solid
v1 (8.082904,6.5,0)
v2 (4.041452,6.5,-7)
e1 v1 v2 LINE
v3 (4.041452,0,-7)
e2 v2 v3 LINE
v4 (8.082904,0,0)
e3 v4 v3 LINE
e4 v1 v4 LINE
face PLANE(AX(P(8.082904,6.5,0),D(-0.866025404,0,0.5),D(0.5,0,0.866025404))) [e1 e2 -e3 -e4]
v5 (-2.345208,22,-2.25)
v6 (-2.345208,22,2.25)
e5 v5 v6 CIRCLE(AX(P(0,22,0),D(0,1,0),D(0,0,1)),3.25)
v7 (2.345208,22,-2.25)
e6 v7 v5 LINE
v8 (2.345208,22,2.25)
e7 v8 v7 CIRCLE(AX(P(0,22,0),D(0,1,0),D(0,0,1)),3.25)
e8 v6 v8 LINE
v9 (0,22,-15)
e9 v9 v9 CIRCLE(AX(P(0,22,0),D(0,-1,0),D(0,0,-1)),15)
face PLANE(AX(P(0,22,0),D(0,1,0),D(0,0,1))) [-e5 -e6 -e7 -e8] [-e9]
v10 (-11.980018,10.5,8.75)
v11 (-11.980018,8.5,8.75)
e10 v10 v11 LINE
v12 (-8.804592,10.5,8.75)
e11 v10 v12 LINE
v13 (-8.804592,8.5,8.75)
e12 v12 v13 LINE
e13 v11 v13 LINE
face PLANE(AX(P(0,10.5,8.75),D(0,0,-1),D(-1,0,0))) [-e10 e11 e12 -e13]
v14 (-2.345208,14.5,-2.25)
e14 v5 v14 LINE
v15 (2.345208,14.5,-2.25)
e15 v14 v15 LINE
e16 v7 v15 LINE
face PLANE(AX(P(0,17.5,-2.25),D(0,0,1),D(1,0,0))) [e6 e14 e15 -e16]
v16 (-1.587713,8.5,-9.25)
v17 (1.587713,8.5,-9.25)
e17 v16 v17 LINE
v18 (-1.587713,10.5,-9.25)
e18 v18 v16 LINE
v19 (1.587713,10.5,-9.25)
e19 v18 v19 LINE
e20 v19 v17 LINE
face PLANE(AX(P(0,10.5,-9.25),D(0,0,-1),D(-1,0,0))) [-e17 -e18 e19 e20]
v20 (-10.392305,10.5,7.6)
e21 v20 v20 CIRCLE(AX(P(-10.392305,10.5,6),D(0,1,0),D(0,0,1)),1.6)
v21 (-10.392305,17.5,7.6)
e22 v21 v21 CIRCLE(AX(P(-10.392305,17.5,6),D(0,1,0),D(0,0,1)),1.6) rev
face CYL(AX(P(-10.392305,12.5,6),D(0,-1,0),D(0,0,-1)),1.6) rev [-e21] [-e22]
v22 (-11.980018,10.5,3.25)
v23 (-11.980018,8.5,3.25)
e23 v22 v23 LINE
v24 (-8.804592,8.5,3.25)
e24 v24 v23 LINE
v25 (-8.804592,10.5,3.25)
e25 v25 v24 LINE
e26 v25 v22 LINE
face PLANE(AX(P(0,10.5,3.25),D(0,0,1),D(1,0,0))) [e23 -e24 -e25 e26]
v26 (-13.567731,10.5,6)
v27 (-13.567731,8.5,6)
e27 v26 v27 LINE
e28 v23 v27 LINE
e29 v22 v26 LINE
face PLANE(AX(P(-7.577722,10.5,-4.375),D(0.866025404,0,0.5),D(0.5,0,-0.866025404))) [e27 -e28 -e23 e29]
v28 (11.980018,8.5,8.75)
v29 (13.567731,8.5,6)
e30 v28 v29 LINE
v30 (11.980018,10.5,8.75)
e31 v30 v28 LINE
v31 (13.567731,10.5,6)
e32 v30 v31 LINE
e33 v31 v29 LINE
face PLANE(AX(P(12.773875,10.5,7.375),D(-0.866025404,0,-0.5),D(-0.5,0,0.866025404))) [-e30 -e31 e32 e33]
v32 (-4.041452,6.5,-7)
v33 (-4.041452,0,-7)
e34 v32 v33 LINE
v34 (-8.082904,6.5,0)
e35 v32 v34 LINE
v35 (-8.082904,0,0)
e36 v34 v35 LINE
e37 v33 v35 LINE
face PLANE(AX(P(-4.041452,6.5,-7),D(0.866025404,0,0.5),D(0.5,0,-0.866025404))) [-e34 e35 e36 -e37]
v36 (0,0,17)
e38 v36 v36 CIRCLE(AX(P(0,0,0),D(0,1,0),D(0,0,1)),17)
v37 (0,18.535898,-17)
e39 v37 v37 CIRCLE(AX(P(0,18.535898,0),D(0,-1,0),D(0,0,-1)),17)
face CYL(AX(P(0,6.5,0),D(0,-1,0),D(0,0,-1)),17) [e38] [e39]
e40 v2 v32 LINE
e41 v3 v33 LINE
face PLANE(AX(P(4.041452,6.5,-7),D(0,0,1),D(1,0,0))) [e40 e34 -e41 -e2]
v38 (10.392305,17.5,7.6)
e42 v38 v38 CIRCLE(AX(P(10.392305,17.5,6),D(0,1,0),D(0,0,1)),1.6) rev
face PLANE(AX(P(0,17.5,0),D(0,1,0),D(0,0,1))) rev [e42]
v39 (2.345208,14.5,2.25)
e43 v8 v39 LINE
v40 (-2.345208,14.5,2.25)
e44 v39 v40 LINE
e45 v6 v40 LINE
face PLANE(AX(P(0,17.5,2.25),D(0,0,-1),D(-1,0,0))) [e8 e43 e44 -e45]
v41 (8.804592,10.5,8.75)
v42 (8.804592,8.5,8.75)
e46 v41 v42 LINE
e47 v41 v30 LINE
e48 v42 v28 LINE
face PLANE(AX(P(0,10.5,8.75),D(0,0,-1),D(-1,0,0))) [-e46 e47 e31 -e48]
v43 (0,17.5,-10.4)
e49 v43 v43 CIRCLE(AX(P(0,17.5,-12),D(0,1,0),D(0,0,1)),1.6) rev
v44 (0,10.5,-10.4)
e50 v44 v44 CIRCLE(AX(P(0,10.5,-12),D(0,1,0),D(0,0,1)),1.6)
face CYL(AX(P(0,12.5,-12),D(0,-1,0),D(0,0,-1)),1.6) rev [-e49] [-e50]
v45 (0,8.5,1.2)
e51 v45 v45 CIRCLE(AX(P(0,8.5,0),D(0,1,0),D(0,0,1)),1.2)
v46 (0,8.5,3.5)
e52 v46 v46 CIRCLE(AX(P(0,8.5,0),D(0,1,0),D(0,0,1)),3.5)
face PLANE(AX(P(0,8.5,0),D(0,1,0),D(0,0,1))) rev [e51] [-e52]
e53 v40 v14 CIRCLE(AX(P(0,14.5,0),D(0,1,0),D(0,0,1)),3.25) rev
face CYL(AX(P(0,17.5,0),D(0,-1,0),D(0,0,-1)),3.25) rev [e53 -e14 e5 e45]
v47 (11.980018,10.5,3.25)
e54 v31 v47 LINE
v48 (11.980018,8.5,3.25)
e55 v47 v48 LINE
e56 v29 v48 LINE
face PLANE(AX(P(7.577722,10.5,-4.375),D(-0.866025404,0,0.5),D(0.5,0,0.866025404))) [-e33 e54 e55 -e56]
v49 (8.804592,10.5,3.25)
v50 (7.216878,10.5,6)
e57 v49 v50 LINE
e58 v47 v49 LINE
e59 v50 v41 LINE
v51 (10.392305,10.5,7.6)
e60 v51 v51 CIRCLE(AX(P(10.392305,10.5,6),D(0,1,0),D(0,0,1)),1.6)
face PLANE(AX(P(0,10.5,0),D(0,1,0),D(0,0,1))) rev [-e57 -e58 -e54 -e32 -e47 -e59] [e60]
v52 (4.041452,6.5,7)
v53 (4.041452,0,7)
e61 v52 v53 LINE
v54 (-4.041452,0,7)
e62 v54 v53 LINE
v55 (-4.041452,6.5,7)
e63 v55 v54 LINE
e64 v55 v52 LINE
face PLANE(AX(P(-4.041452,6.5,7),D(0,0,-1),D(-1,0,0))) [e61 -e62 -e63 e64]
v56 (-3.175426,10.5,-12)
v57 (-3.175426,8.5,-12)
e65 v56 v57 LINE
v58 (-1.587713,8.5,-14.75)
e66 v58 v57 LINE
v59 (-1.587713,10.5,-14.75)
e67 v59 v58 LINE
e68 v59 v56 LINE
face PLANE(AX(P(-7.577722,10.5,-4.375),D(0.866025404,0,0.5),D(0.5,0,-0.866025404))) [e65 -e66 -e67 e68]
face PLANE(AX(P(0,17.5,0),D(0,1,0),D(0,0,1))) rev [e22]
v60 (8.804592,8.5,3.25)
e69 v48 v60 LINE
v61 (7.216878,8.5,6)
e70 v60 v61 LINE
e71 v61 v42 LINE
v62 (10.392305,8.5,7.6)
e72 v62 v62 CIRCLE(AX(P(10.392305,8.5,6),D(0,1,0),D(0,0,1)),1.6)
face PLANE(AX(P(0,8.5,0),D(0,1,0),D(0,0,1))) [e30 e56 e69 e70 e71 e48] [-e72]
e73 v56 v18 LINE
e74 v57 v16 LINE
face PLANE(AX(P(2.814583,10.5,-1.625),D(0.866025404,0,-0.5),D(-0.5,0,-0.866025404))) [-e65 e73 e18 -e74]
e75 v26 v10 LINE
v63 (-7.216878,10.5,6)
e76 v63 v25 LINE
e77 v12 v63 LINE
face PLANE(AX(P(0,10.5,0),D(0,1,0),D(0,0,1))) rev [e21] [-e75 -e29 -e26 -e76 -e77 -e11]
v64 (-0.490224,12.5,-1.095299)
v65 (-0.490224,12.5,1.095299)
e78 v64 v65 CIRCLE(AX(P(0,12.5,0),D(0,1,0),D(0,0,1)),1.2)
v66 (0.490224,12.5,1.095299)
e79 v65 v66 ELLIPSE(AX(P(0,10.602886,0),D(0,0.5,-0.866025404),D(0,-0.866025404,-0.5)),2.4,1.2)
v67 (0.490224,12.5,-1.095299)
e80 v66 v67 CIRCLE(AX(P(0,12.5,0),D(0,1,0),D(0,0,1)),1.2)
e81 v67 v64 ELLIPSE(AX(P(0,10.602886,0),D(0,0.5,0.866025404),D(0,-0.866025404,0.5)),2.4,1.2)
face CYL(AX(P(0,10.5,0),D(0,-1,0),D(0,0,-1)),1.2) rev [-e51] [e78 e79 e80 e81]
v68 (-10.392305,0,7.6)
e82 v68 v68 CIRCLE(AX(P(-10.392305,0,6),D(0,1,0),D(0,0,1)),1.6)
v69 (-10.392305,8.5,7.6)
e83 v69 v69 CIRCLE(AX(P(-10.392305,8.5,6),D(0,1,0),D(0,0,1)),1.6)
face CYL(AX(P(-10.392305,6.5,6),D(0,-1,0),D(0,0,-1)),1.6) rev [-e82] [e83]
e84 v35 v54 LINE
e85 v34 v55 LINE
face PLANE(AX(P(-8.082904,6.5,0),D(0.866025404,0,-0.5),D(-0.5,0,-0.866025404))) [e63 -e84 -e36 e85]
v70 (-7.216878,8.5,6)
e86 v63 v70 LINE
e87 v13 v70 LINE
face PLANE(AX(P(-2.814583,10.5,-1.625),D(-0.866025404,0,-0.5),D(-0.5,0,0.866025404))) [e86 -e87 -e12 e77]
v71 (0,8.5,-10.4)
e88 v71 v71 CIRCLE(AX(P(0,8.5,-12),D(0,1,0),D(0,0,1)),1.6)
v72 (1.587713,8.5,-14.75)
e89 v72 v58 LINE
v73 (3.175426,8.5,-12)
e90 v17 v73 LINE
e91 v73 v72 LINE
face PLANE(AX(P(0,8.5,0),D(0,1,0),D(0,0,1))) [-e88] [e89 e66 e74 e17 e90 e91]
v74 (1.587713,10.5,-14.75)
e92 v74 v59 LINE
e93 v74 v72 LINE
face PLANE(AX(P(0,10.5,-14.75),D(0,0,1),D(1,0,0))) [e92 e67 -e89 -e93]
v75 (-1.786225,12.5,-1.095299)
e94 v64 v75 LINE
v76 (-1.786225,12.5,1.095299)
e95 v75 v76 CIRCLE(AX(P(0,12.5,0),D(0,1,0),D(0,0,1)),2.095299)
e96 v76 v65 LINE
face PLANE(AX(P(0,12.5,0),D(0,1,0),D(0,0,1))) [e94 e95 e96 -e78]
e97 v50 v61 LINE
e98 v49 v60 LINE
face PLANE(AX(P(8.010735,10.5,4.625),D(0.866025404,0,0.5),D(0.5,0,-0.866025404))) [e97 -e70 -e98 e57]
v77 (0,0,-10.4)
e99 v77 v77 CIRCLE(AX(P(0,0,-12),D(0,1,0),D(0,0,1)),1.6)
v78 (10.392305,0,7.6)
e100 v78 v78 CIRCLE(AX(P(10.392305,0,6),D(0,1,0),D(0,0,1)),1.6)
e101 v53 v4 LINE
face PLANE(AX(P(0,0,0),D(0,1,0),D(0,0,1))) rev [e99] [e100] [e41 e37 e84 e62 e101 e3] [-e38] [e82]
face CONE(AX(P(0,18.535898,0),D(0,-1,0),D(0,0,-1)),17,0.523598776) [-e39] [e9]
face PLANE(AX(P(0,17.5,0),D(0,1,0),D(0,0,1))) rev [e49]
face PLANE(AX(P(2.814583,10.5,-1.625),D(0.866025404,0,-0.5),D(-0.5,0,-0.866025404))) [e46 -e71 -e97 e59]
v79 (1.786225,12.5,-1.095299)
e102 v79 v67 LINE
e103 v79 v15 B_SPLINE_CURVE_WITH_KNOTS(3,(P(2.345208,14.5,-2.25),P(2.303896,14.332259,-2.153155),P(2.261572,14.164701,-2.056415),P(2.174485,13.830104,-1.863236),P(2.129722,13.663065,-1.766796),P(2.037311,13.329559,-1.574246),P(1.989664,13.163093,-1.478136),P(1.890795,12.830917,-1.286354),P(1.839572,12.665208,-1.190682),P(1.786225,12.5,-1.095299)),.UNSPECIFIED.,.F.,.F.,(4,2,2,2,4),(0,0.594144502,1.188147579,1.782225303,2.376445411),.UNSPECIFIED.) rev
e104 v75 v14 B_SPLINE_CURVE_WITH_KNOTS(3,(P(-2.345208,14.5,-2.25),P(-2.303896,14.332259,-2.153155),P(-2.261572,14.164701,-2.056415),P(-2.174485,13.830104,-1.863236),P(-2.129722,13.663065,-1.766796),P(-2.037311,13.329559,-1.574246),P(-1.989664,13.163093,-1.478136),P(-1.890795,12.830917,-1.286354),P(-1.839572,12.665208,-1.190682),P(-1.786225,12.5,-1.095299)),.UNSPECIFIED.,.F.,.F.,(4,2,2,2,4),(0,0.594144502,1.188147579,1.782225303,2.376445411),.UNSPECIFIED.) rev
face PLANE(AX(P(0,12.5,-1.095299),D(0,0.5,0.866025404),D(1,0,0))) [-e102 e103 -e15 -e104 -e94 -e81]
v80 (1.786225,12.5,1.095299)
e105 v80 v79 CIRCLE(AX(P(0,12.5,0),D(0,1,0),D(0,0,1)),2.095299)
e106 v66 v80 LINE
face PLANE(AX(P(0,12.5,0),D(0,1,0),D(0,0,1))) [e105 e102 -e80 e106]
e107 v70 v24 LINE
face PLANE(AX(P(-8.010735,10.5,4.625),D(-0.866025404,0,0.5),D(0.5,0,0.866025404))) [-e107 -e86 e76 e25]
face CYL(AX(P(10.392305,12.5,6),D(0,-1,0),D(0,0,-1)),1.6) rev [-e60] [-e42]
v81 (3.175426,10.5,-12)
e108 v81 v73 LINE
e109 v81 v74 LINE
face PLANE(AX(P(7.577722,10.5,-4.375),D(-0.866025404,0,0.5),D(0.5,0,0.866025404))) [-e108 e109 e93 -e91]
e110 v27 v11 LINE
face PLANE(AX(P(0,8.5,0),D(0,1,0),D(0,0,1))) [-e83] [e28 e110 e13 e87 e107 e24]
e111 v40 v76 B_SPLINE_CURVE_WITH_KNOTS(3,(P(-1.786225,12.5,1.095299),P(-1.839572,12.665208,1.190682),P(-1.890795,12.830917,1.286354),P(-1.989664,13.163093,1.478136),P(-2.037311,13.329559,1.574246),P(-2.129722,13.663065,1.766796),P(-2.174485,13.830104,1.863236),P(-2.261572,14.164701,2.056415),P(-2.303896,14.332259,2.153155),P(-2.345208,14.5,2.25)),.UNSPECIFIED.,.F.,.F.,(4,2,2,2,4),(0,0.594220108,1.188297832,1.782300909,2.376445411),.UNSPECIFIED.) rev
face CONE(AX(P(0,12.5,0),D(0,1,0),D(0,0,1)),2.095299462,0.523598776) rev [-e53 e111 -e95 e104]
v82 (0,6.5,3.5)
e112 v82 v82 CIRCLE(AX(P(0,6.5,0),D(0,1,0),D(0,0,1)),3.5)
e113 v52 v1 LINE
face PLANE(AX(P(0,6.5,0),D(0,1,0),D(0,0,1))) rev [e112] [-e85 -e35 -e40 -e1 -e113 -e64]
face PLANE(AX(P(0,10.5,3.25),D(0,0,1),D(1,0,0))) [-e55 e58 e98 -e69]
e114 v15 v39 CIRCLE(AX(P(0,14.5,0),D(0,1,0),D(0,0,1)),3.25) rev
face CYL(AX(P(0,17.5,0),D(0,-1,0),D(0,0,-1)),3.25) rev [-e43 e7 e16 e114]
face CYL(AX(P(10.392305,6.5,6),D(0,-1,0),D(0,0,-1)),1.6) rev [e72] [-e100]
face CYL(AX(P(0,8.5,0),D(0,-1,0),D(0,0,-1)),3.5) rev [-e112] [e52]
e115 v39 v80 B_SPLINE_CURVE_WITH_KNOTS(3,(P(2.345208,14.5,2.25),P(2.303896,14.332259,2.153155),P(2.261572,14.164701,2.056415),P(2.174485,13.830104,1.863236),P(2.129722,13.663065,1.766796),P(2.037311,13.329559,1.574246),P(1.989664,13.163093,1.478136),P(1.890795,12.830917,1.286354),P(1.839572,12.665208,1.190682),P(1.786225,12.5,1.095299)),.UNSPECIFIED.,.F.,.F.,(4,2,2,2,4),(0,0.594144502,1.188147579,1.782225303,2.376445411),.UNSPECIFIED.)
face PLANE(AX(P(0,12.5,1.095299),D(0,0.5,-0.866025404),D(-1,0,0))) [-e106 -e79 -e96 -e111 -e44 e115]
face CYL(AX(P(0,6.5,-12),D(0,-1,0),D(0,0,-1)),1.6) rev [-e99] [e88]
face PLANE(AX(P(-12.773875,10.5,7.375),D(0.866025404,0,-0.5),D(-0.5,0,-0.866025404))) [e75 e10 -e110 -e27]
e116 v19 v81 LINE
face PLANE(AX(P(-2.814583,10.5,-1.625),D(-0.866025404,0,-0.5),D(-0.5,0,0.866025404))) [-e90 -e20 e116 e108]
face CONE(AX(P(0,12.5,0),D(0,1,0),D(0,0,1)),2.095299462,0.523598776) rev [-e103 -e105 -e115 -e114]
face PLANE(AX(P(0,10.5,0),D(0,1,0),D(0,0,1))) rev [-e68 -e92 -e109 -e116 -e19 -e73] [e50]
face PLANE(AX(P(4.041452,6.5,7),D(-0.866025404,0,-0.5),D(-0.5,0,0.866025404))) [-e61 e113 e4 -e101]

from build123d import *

# Parameters (mm, degrees)
SKETCH1_R                 = 17
SKETCH1_R_2               = 1.6000000000000005
SKETCH1_R_3               = 1.6000000000000019
SKETCH1_R_4               = 1.5999999999999999
BOSS_EXTRUDE1_DEPTH       = 6.500000000000001
SKETCH2_R                 = 17
SKETCH2_R_2               = 3.4999999999999996
SKETCH2_R_3               = 1.6000000000000012
SKETCH2_R_4               = 1.6000000000000019
SKETCH2_R_5               = 1.5999999999999963
BOSS_EXTRUDE2_DEPTH       = 2
SKETCH3_R                 = 17
SKETCH3_R_2               = 1.2
BOSS_EXTRUDE3_DEPTH       = 2
SKETCH9_R                 = 17
SKETCH9_R_2               = 1.2
SKETCH9_R_3               = 1.5999999999999963
SKETCH9_R_4               = 1.6000000000000012
SKETCH9_R_5               = 1.6000000000000019
BOSS_EXTRUDE6_DEPTH       = 2
BOSS_EXTRUDE4_OUTLINE_R   = 17
BOSS_EXTRUDE4_OUTLINE_R_2 = 1.6
BOSS_EXTRUDE4_DEPTH       = 5
SKETCH10_R                = 17
BOSS_EXTRUDE7_DEPTH       = 4.500000000000001
CHAMFER1_SIZE             = 1.154700538
CHAMFER1_SIZE_2           = 2


# Read off the part's stored shape, not the designer's step: Boss-Extrude4
with BuildPart() as part:
    # Sketch1 → Boss-Extrude1 (new body)
    with BuildSketch(Plane(origin=(0, 0, 0), x_dir=(1, 0, 0), z_dir=(0, 1, 0))):
        with Locations(Location((0, 0, 0), (0, 0, 270))):
            Circle(SKETCH1_R)
        with Locations(Location((0, 12, 0), (0, 0, 270))):
            Circle(SKETCH1_R_2, mode=Mode.SUBTRACT)
        with Locations(Location((10.392304845413268, -5.999999999999997, 0), (0, 0, 270))):
            Circle(SKETCH1_R_3, mode=Mode.SUBTRACT)
        with Locations(Location((-10.39230484541326, -6.000000000000005, 0), (0, 0, 270))):
            Circle(SKETCH1_R_4, mode=Mode.SUBTRACT)
        Polygon((4.04145188432738, -6.999999999999999), (8.082903768654761, -8.7e-16), (4.041451884327381, 6.999999999999999), (-4.041451884327381, 6.999999999999999), (-8.082903768654761, -8.7e-16), (-4.04145188432738, -6.999999999999999), align=None, mode=Mode.SUBTRACT)
    extrude(amount=BOSS_EXTRUDE1_DEPTH)

    # Sketch2 → Boss-Extrude2 (add)
    with BuildSketch(Plane(origin=(0, 6.500000000000001, 0), x_dir=(1, 0, 0), z_dir=(0, 1, 0))):
        with Locations(Location((0, 0, 0), (0, 0, 270))):
            Circle(SKETCH2_R)
        with Locations(Location((0, 0, 0), (0, 0, 270))):
            Circle(SKETCH2_R_2, mode=Mode.SUBTRACT)
        with Locations(Location((0, 12, 0), (0, 0, 270))):
            Circle(SKETCH2_R_3, mode=Mode.SUBTRACT)
        with Locations(Location((10.392304845413268, -5.999999999999997, 0), (0, 0, 270))):
            Circle(SKETCH2_R_4, mode=Mode.SUBTRACT)
        with Locations(Location((-10.39230484541326, -6.000000000000005, 0), (0, 0, 270))):
            Circle(SKETCH2_R_5, mode=Mode.SUBTRACT)
    extrude(amount=BOSS_EXTRUDE2_DEPTH)

    # Sketch3 → Boss-Extrude3 (add)
    with BuildSketch(Plane(origin=(0, 8.5, 0), x_dir=(1, 0, 0), z_dir=(0, 1, 0))):
        with Locations(Location((0, 0, 0), (0, 0, 270))):
            Circle(SKETCH3_R)
        with Locations(Location((0, 0, 0), (0, 0, 270))):
            Circle(SKETCH3_R_2, mode=Mode.SUBTRACT)
        Polygon((3.175426480542944, 11.999999999999996), (1.5877132402714735, 14.75), (-1.5877132402714682, 14.75), (-3.1754264805429417, 11.999999999999995), (-1.5877132402714735, 9.249999999999998), (1.5877132402714729, 9.249999999999998), align=None, mode=Mode.SUBTRACT)
        Polygon((-8.804591605141788, -8.750000000000009), (-7.216878364870316, -6.0000000000000036), (-8.80459160514179, -3.2500000000000013), (-11.980018085684733, -3.250000000000002), (-13.567731325956206, -6.000000000000007), (-11.980018085684732, -8.750000000000009), align=None, mode=Mode.SUBTRACT)
        Polygon((8.804591605141793, -8.75), (11.980018085684742, -8.75), (13.567731325956213, -5.999999999999997), (11.98001808568474, -3.2499999999999925), (8.804591605141791, -3.249999999999992), (7.216878364870319, -5.999999999999996), align=None, mode=Mode.SUBTRACT)
    extrude(amount=BOSS_EXTRUDE3_DEPTH)

    # Sketch9 → Boss-Extrude6 (add)
    with BuildSketch(Plane(origin=(0, 10.5, 0), x_dir=(1, 0, 0), z_dir=(0, 1, 0))):
        with Locations(Location((0, 0, 0), (0, 0, 270))):
            Circle(SKETCH9_R)
        with Locations(Location((0, 0, 0), (0, 0, 270))):
            Circle(SKETCH9_R_2, mode=Mode.SUBTRACT)
        with Locations(Location((-10.39230484541326, -6.000000000000005, 0), (0, 0, 270))):
            Circle(SKETCH9_R_3, mode=Mode.SUBTRACT)
        with Locations(Location((0, 12, 0), (0, 0, 270))):
            Circle(SKETCH9_R_4, mode=Mode.SUBTRACT)
        with Locations(Location((10.392304845413268, -5.999999999999997, 0), (0, 0, 270))):
            Circle(SKETCH9_R_5, mode=Mode.SUBTRACT)
    extrude(amount=BOSS_EXTRUDE6_DEPTH)

    # Boss-Extrude4 outline → Boss-Extrude4 (add)
    with BuildSketch(Plane(origin=(0, 12.5, 0), x_dir=(1, 0, 0), z_dir=(0, 1, 0))):
        Circle(BOSS_EXTRUDE4_OUTLINE_R)
        with Locations((-10.392304845, -6)):
            Circle(BOSS_EXTRUDE4_OUTLINE_R_2, mode=Mode.SUBTRACT)
        with Locations((10.392304845, -6)):
            Circle(BOSS_EXTRUDE4_OUTLINE_R_2, mode=Mode.SUBTRACT)
        with BuildLine():
            Line((-2.34520788, 2.25), (2.34520788, 2.25))
            ThreePointArc((2.34520788, 2.25), (3.25, 0), (2.34520788, -2.25))
            Line((2.34520788, -2.25), (-2.34520788, -2.25))
            ThreePointArc((-2.34520788, -2.25), (-3.25, 0), (-2.34520788, 2.25))
        make_face(mode=Mode.SUBTRACT)
        with Locations((0, 12)):
            Circle(BOSS_EXTRUDE4_OUTLINE_R_2, mode=Mode.SUBTRACT)
    extrude(amount=BOSS_EXTRUDE4_DEPTH)

    # Sketch10 → Boss-Extrude7 (add)
    with BuildSketch(Plane(origin=(0, 17.5, 0), x_dir=(1, 0, 0), z_dir=(0, 1, 0))):
        with Locations(Location((0, 0, 0), (0, 0, 270))):
            Circle(SKETCH10_R)
        with BuildLine():
            Line((-2.345207879911715, -2.2500000000000004), (2.345207879911715, -2.2500000000000004))
            ThreePointArc((2.345207879911715, -2.2500000000000004), (3.2500000000000004, 0), (2.345207879911715, 2.2500000000000004))
            Line((2.345207879911715, 2.2500000000000004), (-2.345207879911715, 2.2500000000000004))
            ThreePointArc((-2.345207879911715, 2.2500000000000004), (-3.2500000000000004, 4e-16), (-2.345207879911715, -2.2500000000000004))
        make_face(mode=Mode.SUBTRACT)
    extrude(amount=BOSS_EXTRUDE7_DEPTH)

    # Sketch5 → Cut-Revolve2 (revolve, cut)
    with BuildSketch(Plane(origin=(0, 0, 0), x_dir=(0, 0, -1), z_dir=(1, 0, 0)), mode=Mode.PRIVATE) as cut_revolve2_sk:
        Polygon((-17, 18.535898384862204), (-15.000000000000002, 22), (-17, 22.000000000000004), align=None)
    revolve(cut_revolve2_sk.sketch.rotate(Axis((0, 0, 0), (0, 1, 0)), 180), axis=Axis((0, 0, 0), (0, 1, 0)), mode=Mode.SUBTRACT)

    # Chamfer1
    # the kernel refuses this chamfer: 2, 1.154700538 mm, written as the material it adds along each edge
    with BuildSketch(Plane(origin=(-2.2883428e-10, 12.5, 0), x_dir=(-0.7079171545098687, 0, -0.706295478076032), z_dir=(-0.706295478076032, 0, 0.7079171545098687))) as chamfer1_piece_1:
        Polygon((3.2500000002288263 - CHAMFER1_SIZE, 0), (3.2500000002288343, -CHAMFER1_SIZE_2), (3.2500000002288263, 0), align=None)
    revolve(axis=Axis((-2.2883428e-10, 12.5, 0), (0, -1, 0)), revolution_arc=270.1314019865591)
    with BuildSketch(Plane(origin=(-7.519379389291984, 12.5, -2.2500000000000004), x_dir=(0, 0.9998132206222079, -0.01932676561270072), z_dir=(1, 0, 0))) as chamfer1_piece_2_section:
        Polygon((CHAMFER1_SIZE_2 * 0.999813220622, CHAMFER1_SIZE_2 * 0.0193267656127), (-CHAMFER1_SIZE * 0.019326765619, CHAMFER1_SIZE * 0.999813220951), (0, 0), align=None)
    chamfer1_piece_2 = extrude(amount=15.038758778583968, mode=Mode.PRIVATE)
    chamfer1_piece_2 = chamfer1_piece_2 - Plane(origin=(0, 13.182227685151497, 0), x_dir=(-1.8e-16, 0, 1), z_dir=(0, -1, 0)) * Cylinder(1.2, 39, mode=Mode.PRIVATE)
    add(chamfer1_piece_2)
    with BuildSketch(Plane(origin=(2.2883428e-10, 12.5, 0), x_dir=(0.7079171545098687, 0, 0.706295478076032), z_dir=(0.706295478076032, 0, -0.7079171545098687))) as chamfer1_piece_3:
        Polygon((3.2500000002288343, -CHAMFER1_SIZE_2), (3.250000000228834 - CHAMFER1_SIZE, 0), (3.250000000228834, 0), align=None)
    revolve(axis=Axis((2.2883428e-10, 12.5, 0), (0, -1, 0)), revolution_arc=270.1314019865591)
    with BuildSketch(Plane(origin=(7.519379389291984, 12.5, 2.2500000000000004), x_dir=(0, 0.9998132206222079, 0.01932676561270072), z_dir=(-1, 0, 0))) as chamfer1_piece_4_section:
        Polygon((CHAMFER1_SIZE_2 * 0.999813220622, CHAMFER1_SIZE_2 * 0.0193267656127), (-CHAMFER1_SIZE * 0.019326765619, CHAMFER1_SIZE * 0.999813220951), (0, 0), align=None)
    chamfer1_piece_4 = extrude(amount=15.038758778583968, mode=Mode.PRIVATE)
    chamfer1_piece_4 = chamfer1_piece_4 - Plane(origin=(0, 13.182227685146668, 0), x_dir=(-1.8e-16, 0, 1), z_dir=(0, -1, 0)) * Cylinder(1.2, 39, mode=Mode.PRIVATE)
    add(chamfer1_piece_4)


solid = part.part
